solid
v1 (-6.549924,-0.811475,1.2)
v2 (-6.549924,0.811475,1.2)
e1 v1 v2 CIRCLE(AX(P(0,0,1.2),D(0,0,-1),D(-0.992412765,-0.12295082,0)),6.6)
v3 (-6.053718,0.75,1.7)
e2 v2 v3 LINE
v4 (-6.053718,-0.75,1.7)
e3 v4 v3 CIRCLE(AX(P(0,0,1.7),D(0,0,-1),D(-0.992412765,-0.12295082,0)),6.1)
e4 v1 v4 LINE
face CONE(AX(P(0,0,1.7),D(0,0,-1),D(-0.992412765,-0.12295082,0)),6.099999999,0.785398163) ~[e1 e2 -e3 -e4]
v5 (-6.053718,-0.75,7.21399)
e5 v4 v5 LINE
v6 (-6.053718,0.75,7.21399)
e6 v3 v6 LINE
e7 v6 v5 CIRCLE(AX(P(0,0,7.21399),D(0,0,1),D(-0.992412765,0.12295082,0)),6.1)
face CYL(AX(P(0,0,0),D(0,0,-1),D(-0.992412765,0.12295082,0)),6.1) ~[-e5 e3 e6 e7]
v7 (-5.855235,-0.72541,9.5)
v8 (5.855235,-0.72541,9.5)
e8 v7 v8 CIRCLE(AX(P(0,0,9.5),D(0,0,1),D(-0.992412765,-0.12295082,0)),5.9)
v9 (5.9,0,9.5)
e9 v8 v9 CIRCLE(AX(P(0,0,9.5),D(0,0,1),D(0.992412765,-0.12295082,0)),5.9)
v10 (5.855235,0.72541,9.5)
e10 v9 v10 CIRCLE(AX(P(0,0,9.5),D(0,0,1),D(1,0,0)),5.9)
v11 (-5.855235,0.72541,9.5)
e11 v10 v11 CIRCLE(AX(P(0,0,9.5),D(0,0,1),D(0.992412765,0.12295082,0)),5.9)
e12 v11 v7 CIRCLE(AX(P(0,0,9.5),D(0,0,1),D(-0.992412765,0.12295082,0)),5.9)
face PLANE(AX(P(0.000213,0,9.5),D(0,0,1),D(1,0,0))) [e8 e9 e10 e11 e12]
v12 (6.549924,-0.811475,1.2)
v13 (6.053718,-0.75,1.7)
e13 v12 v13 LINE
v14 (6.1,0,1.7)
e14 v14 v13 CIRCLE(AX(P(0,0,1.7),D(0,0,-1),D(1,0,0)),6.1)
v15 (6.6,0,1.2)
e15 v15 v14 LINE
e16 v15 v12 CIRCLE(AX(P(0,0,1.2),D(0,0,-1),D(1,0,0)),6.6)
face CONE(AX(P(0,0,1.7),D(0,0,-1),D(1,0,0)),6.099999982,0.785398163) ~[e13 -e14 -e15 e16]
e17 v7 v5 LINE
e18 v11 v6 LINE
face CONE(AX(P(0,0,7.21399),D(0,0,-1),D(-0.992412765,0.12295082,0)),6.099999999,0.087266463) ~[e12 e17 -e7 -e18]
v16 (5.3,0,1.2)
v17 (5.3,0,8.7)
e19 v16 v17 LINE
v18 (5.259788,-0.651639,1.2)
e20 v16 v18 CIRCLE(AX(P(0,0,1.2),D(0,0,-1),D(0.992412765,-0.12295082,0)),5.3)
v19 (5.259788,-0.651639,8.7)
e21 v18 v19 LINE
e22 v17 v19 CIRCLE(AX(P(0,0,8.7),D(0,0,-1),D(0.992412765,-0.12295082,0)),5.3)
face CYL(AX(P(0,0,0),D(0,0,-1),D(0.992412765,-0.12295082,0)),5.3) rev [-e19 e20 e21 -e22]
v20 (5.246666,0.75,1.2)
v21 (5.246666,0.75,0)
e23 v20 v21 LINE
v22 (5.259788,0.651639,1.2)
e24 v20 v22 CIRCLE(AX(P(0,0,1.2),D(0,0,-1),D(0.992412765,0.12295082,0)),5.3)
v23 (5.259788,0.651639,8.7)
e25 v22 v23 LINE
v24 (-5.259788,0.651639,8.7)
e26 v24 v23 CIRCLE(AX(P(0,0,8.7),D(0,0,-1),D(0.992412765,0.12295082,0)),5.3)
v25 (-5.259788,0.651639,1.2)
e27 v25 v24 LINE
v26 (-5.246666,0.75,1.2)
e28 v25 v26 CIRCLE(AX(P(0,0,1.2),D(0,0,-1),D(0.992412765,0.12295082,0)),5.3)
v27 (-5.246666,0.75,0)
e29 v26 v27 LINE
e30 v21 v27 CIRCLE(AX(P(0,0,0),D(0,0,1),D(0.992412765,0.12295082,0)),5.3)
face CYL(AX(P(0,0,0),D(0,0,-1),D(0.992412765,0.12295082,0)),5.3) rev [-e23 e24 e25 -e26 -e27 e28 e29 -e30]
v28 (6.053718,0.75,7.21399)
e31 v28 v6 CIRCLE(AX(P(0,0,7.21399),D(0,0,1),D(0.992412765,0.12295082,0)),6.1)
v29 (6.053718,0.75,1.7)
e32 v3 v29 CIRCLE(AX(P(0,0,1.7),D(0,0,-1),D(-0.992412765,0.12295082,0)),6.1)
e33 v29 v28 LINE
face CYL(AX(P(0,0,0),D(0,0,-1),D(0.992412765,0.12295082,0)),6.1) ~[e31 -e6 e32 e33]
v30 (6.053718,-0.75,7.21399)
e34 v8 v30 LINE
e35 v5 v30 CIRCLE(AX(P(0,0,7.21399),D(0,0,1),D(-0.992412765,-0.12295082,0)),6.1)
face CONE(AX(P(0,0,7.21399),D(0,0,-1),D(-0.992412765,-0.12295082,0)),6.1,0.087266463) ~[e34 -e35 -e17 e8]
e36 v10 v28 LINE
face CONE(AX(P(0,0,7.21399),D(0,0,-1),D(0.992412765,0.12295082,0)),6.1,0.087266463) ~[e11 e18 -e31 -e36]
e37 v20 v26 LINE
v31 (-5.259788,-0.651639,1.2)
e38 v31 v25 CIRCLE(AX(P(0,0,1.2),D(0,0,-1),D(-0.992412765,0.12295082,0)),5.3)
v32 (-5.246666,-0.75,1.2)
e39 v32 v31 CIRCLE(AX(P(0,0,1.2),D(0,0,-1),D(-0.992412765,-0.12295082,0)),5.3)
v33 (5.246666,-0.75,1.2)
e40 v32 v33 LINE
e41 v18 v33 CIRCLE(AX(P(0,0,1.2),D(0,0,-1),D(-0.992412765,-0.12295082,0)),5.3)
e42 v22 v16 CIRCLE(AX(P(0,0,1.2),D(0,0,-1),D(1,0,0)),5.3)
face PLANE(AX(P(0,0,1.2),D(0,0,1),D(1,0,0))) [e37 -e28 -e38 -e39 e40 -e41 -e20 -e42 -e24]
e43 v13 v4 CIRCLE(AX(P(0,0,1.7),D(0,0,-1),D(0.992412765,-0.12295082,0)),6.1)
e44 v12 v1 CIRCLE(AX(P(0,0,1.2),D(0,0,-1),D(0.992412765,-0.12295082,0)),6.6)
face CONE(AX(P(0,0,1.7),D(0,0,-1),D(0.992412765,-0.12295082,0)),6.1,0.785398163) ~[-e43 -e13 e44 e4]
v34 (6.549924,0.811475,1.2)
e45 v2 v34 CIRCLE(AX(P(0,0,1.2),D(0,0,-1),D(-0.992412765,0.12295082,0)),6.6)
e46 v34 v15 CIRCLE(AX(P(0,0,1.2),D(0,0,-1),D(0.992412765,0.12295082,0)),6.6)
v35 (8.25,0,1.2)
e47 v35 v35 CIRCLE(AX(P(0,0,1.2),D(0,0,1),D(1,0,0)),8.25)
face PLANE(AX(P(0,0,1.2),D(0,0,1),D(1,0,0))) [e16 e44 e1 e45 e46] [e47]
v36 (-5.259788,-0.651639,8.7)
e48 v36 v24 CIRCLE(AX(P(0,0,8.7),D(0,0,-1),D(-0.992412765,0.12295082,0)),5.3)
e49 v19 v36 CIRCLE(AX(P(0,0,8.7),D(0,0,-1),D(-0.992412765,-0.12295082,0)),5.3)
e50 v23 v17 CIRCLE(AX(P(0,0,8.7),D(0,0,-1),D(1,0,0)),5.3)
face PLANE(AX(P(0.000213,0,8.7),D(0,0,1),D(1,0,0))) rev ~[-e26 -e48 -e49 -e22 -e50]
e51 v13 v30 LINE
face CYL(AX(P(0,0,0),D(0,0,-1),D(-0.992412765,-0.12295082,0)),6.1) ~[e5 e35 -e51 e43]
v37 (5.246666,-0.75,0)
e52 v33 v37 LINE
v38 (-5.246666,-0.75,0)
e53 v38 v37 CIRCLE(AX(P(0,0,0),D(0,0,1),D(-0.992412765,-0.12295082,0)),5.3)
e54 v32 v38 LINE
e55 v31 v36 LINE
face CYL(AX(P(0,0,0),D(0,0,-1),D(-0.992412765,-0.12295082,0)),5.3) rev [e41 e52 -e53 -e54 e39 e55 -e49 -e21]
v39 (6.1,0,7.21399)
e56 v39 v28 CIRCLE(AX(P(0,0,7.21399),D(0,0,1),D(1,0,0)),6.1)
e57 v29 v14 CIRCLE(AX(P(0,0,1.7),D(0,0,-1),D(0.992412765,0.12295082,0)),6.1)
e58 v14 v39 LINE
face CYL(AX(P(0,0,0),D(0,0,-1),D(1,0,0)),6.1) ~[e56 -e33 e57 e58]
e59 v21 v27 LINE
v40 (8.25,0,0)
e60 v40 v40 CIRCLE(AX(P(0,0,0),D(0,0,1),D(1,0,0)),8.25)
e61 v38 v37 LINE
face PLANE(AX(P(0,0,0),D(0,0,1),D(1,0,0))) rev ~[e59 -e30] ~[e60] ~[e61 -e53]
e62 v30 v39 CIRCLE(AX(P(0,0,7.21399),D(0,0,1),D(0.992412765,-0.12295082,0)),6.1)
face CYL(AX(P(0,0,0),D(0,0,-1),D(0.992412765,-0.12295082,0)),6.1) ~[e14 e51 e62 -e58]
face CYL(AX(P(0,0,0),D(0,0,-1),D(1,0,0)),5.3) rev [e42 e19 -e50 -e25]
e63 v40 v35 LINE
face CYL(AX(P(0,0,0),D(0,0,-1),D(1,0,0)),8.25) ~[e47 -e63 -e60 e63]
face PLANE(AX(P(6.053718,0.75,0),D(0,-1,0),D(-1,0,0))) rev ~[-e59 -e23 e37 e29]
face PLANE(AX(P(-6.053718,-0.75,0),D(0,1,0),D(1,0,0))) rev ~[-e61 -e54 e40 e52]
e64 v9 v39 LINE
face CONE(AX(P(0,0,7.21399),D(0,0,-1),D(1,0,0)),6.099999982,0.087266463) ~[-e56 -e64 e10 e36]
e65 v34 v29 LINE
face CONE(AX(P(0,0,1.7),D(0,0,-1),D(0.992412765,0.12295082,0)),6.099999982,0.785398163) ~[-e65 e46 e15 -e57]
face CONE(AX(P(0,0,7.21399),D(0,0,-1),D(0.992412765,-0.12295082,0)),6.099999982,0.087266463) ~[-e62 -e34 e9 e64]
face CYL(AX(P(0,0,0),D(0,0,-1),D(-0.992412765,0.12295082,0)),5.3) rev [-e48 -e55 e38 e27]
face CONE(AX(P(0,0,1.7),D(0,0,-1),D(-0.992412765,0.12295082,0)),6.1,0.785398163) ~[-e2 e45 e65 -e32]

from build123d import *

# Parameters (mm, degrees)
F1_DEPTH = 9.5
F2_T     = -0.8
F0_R     = 8.25
F3_DEPTH = 1.2
F4_SIZE2 = 2.2860104606
F4_SIZE  = 0.2
F5_SIZE  = 0.5


with BuildPart() as f1:
    # F0 (on Top) → F1 (new body)
    with BuildSketch(Plane.XY):
        with BuildLine():
            ThreePointArc((6.0537178659, -0.75), (6.0884184721, -0.3757133335), (6.1, 0))
            ThreePointArc((6.1, 0), (6.0884184721, 0.3757133335), (6.0537178659, 0.75))
            Line((6.0537178659, 0.75), (-6.0537178659, 0.75))
            ThreePointArc((-6.0537178659, 0.75), (-6.1, 0), (-6.0537178659, -0.75))
            Line((-6.0537178659, -0.75), (6.0537178659, -0.75))
        make_face()
        with BuildLine():
            Line((-6.0537178659, 0.75), (6.0537178659, 0.75))
            ThreePointArc((6.0537178659, 0.75), (0, 6.1), (-6.0537178659, 0.75))
        make_face()
        with BuildLine():
            ThreePointArc((-6.0537178659, -0.75), (0, -6.1), (6.0537178659, -0.75))
            Line((6.0537178659, -0.75), (-6.0537178659, -0.75))
        make_face()
    extrude(amount=F1_DEPTH)

    # F2
    f2_openings = [f1.faces().sort_by_distance(p)[0] for p in [
        (0, 0, 0),
    ]]
    offset(amount=F2_T, openings=f2_openings)

    # F0 (on Top) → F3 (join)
    with BuildSketch(Plane.XY):
        Circle(F0_R)
        with BuildLine():
            ThreePointArc((-6.0537178659, 0.75), (0, 6.1), (6.0537178659, 0.75))
            Line((6.0537178659, 0.75), (7.5, 0.75))
            Line((7.5, 0.75), (7.5, -0.75))
            Line((7.5, -0.75), (6.0537178659, -0.75))
            ThreePointArc((6.0537178659, -0.75), (0, -6.1), (-6.0537178659, -0.75))
            Line((-6.0537178659, -0.75), (-7.5, -0.75))
            Line((-7.5, -0.75), (-7.5, 0.75))
            Line((-7.5, 0.75), (-6.0537178659, 0.75))
        make_face(mode=Mode.SUBTRACT)
        with BuildLine():
            ThreePointArc((6.0537178659, -0.75), (6.0884184721, -0.3757133335), (6.1, 0))
            ThreePointArc((6.1, 0), (6.0884184721, 0.3757133335), (6.0537178659, 0.75))
            Line((6.0537178659, 0.75), (-6.0537178659, 0.75))
            ThreePointArc((-6.0537178659, 0.75), (-6.1, 0), (-6.0537178659, -0.75))
            Line((-6.0537178659, -0.75), (6.0537178659, -0.75))
        make_face()
        with BuildLine():
            ThreePointArc((6.0537178659, 0.75), (6.0884184721, 0.3757133335), (6.1, 0))
            ThreePointArc((6.1, 0), (6.0884184721, -0.3757133335), (6.0537178659, -0.75))
            Line((6.0537178659, -0.75), (7.5, -0.75))
            Line((7.5, -0.75), (7.5, 0.75))
            Line((7.5, 0.75), (6.0537178659, 0.75))
        make_face()
        with BuildLine():
            ThreePointArc((-6.0537178659, -0.75), (-6.1, 0), (-6.0537178659, 0.75))
            Line((-6.0537178659, 0.75), (-7.5, 0.75))
            Line((-7.5, 0.75), (-7.5, -0.75))
            Line((-7.5, -0.75), (-6.0537178659, -0.75))
        make_face()
    extrude(amount=F3_DEPTH)

    # F4
    f4_edges = [f1.edges().sort_by_distance(p)[0] for p in [
        (6.053718, 0.75, 9.5),
    ]]
    f4_side = f1.faces().sort_by_distance((0, 0, 9.5))[0]
    chamfer(f4_edges, length=F4_SIZE, length2=F4_SIZE2, reference=f4_side)

    # F5
    f5_edges = [f1.edges().sort_by_distance(p)[0] for p in [
        (6.053718, 0.75, 1.2),
    ]]
    chamfer(f5_edges, length=F5_SIZE)


solid = f1.part
